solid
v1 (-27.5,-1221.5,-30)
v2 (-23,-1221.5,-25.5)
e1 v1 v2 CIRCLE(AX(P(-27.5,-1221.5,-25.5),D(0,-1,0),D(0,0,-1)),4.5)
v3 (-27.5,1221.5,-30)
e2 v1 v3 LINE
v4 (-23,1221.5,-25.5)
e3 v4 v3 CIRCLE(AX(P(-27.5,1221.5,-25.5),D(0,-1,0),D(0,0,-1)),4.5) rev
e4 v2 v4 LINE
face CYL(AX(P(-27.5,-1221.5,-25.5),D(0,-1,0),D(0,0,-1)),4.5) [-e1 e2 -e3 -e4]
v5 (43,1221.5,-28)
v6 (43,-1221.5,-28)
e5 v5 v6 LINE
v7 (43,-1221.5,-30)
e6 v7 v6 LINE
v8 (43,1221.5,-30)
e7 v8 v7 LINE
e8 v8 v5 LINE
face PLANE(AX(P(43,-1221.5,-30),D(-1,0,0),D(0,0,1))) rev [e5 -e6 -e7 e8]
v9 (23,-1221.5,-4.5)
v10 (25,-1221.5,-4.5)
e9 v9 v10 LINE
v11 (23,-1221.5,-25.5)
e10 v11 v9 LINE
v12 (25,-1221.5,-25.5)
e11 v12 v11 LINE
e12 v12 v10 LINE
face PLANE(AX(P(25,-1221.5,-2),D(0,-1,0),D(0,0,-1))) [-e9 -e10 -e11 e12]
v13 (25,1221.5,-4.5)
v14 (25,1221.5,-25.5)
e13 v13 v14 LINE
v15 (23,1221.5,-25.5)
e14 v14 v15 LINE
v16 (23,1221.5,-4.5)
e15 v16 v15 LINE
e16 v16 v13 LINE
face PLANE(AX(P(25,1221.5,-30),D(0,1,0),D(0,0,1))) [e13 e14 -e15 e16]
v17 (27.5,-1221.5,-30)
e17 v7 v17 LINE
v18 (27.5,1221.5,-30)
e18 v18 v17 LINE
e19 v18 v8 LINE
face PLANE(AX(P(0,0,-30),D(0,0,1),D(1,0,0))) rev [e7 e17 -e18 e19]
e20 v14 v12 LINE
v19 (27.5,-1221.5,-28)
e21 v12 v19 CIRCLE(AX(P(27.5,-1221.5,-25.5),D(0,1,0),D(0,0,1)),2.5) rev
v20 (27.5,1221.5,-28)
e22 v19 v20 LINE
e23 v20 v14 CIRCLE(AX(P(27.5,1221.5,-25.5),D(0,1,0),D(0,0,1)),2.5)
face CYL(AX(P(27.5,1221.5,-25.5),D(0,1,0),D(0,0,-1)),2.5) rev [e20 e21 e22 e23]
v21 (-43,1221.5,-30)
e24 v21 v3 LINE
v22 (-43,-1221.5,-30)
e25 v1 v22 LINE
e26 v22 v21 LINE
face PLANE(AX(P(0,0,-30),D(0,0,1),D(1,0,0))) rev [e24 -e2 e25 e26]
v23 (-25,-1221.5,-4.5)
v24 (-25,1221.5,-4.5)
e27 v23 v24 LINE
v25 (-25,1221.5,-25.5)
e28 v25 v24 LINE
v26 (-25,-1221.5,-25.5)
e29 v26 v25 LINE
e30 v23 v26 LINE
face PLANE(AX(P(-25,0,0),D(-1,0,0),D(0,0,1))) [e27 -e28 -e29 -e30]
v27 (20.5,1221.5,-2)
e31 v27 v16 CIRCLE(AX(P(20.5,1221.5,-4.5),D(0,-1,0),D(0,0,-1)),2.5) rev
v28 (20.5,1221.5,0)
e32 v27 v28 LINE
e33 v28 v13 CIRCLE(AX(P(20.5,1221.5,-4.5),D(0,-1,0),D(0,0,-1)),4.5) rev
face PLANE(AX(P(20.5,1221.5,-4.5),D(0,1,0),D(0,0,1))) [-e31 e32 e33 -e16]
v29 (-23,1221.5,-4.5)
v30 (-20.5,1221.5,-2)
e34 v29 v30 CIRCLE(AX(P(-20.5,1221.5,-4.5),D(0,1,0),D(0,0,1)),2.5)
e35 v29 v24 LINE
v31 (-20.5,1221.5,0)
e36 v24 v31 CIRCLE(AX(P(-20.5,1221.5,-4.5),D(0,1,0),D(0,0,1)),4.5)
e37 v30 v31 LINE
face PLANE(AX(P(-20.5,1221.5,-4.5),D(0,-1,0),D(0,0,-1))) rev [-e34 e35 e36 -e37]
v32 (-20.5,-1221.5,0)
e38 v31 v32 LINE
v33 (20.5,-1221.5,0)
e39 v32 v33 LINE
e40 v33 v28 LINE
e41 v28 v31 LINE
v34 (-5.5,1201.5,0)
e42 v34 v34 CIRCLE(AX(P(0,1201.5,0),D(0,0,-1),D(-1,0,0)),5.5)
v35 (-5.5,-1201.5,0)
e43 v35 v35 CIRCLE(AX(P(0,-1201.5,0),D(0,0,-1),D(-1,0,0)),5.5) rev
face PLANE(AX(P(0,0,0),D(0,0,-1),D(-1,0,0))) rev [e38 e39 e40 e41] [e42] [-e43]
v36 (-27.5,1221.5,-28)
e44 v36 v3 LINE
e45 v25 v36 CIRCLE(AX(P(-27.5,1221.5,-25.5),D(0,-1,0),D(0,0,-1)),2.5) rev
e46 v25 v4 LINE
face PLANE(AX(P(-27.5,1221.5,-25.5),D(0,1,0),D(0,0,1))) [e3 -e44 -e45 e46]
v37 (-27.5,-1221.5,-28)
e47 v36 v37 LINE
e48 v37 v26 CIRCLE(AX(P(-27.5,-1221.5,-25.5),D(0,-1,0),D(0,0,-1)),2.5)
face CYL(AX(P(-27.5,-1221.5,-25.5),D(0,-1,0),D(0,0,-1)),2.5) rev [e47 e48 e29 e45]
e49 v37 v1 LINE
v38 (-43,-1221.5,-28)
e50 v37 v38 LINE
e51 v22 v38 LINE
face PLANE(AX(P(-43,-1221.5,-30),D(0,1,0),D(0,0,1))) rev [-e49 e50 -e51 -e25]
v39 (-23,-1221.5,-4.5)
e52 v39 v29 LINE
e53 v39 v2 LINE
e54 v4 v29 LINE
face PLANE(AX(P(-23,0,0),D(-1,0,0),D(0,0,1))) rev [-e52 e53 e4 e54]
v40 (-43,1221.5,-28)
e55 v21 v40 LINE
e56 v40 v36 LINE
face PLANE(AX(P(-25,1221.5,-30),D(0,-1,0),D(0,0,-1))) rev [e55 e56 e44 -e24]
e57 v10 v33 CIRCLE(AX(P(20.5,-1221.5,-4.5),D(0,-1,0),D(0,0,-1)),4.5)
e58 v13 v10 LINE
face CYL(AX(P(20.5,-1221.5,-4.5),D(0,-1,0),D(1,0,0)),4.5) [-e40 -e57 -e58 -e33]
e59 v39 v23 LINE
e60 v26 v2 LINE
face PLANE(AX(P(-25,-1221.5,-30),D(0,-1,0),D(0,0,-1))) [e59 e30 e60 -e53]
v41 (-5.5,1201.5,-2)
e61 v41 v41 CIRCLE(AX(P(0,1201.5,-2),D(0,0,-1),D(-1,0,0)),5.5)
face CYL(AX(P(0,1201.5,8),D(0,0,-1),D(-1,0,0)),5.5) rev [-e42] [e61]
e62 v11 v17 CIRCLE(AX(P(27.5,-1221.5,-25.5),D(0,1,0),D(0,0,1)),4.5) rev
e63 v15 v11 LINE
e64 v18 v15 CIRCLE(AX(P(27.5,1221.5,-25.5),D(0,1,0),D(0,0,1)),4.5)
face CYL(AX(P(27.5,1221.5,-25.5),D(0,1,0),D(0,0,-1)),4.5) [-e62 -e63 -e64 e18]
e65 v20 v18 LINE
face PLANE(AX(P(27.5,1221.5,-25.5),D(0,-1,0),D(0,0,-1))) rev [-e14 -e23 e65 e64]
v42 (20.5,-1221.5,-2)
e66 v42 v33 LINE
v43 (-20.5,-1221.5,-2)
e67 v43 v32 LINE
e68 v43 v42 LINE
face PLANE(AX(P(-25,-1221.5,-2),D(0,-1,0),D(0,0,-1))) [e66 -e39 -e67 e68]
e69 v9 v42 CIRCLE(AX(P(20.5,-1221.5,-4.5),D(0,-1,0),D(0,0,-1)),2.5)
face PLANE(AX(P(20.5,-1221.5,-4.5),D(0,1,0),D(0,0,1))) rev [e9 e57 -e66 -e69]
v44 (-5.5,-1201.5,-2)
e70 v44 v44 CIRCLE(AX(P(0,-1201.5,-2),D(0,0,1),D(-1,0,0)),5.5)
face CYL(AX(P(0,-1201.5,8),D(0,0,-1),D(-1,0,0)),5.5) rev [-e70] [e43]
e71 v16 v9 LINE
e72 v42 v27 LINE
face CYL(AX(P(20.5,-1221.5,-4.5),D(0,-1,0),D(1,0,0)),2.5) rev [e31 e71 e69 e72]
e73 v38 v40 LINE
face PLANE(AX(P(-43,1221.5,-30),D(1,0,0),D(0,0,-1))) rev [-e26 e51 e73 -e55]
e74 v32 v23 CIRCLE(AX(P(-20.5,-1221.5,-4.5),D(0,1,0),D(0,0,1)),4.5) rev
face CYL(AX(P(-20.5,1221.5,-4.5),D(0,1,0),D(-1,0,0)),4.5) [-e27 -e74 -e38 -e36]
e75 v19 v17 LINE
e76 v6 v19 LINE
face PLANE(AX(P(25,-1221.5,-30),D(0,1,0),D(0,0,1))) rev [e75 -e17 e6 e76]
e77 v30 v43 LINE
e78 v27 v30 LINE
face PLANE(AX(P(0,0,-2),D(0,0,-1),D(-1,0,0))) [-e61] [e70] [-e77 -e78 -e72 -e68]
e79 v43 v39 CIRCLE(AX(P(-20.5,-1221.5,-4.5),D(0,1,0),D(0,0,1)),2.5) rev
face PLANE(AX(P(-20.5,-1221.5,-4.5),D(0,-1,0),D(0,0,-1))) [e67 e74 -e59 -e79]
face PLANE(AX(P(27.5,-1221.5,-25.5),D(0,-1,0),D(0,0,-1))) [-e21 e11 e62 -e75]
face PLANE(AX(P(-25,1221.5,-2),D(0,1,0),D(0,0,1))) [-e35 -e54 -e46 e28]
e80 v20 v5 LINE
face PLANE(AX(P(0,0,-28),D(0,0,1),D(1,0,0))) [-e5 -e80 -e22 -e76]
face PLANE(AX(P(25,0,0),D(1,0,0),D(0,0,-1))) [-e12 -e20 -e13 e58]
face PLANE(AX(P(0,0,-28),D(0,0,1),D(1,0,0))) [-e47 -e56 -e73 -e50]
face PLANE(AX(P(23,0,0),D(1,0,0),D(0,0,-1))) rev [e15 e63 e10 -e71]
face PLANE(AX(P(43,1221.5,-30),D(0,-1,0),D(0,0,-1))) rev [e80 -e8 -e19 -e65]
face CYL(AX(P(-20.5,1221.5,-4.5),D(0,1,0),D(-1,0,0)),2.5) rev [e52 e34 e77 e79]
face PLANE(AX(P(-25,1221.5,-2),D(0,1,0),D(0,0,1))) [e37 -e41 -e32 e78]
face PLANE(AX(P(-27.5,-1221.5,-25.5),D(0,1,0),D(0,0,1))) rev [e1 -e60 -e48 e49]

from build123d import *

# Parameters (mm, degrees)
SKETCH1_W                      = 50
SKETCH1_H                      = 2443
BASE_FLANGE1_DEPTH             = 2
EDGE_FLANGE1_STRIP_W           = 13
EDGE_FLANGE1_STRIP_H           = 2
EDGE_FLANGE1_STRIP_CUT_DEPTH   = 2443
EDGE_FLANGE1_STRIP_2_W         = 13
EDGE_FLANGE1_STRIP_2_H         = 2
EDGE_FLANGE1_STRIP_CUT_2_DEPTH = 2443
EDGE_FLANGE1_DEPTH             = 2443
EDGE_FLANGE1_BEND_DEPTH        = 2443
EDGE_FLANGE2_STRIP_W           = 13
EDGE_FLANGE2_STRIP_H           = 2
EDGE_FLANGE2_STRIP_CUT_DEPTH   = 2443
EDGE_FLANGE2_STRIP_2_W         = 13
EDGE_FLANGE2_STRIP_2_H         = 2
EDGE_FLANGE2_STRIP_CUT_2_DEPTH = 2443
EDGE_FLANGE2_DEPTH             = 2443
EDGE_FLANGE2_BEND_DEPTH        = 2443
SKETCH18_R                     = 5.5
CUT_EXTRUDE1_DEPTH             = 10


# Sheet-metal steps are written as plain solids
with BuildPart() as part:
    # Sketch1 → Base-Flange1 (new body)
    with BuildSketch(Plane.XY):
        Rectangle(SKETCH1_W, SKETCH1_H)
    extrude(amount=-BASE_FLANGE1_DEPTH)

    # Edge-Flange1 strip (across the edge) → Edge-Flange1 strip cut (cut)
    with BuildSketch(Plane(origin=(25, 1221.5, -2), x_dir=(-1, 0, 0), z_dir=(0, -1, 0))):
        with Locations((-2, -1)):
            Rectangle(EDGE_FLANGE1_STRIP_W, EDGE_FLANGE1_STRIP_H)
    extrude(amount=EDGE_FLANGE1_STRIP_CUT_DEPTH, mode=Mode.SUBTRACT)

    # Edge-Flange1 strip 2 (across the edge) → Edge-Flange1 strip cut 2 (cut)
    with BuildSketch(Plane(origin=(-25, -1221.5, -2), x_dir=(1, 0, 0), z_dir=(0, 1, 0))):
        with Locations((-2, -1)):
            Rectangle(EDGE_FLANGE1_STRIP_2_W, EDGE_FLANGE1_STRIP_2_H)
    extrude(amount=EDGE_FLANGE1_STRIP_CUT_2_DEPTH, mode=Mode.SUBTRACT)

    # Edge-Flange1 section (across the edge) → Edge-Flange1 (add)
    with BuildSketch(Plane(origin=(25, 1221.5, -2), x_dir=(-1, 0, 0), z_dir=(0, -1, 0))):
        with BuildLine():
            Line((0, 2.5), (0, 28))
            Line((0, 28), (2, 28))
            Line((2, 28), (2, 2.5))
            ThreePointArc((2, 2.5), (2.732233047, 0.732233047), (4.5, 0))
            Line((4.5, 0), (4.5, -2))
            ThreePointArc((4.5, -2), (1.318019485, -0.681980515), (0, 2.5))
        make_face()
    extrude(amount=EDGE_FLANGE1_DEPTH)

    # Edge-Flange1 section 2 (across the edge) → Edge-Flange1 bend (add)
    with BuildSketch(Plane(origin=(-25, -1221.5, -2), x_dir=(1, 0, 0), z_dir=(0, 1, 0))):
        with BuildLine():
            Line((0, 2.5), (0, 28))
            Line((0, 28), (2, 28))
            Line((2, 28), (2, 2.5))
            ThreePointArc((2, 2.5), (2.732233047, 0.732233047), (4.5, 0))
            Line((4.5, 0), (4.5, -2))
            ThreePointArc((4.5, -2), (1.318019485, -0.681980515), (0, 2.5))
        make_face()
    extrude(amount=EDGE_FLANGE1_BEND_DEPTH)

    # Edge-Flange2 strip (across the edge) → Edge-Flange2 strip cut (cut)
    with BuildSketch(Plane(origin=(-25, 1221.5, -30), x_dir=(0, 0, 1), z_dir=(0, -1, 0))):
        with Locations((-2, -1)):
            Rectangle(EDGE_FLANGE2_STRIP_W, EDGE_FLANGE2_STRIP_H)
    extrude(amount=EDGE_FLANGE2_STRIP_CUT_DEPTH, mode=Mode.SUBTRACT)

    # Edge-Flange2 strip 2 (across the edge) → Edge-Flange2 strip cut 2 (cut)
    with BuildSketch(Plane(origin=(25, -1221.5, -30), x_dir=(0, 0, 1), z_dir=(0, 1, 0))):
        with Locations((-2, -1)):
            Rectangle(EDGE_FLANGE2_STRIP_2_W, EDGE_FLANGE2_STRIP_2_H)
    extrude(amount=EDGE_FLANGE2_STRIP_CUT_2_DEPTH, mode=Mode.SUBTRACT)

    # Edge-Flange2 section (across the edge) → Edge-Flange2 (add)
    with BuildSketch(Plane(origin=(-25, 1221.5, -30), x_dir=(0, 0, 1), z_dir=(0, -1, 0))):
        with BuildLine():
            Line((0, 2.5), (0, 18))
            Line((0, 18), (2, 18))
            Line((2, 18), (2, 2.5))
            ThreePointArc((2, 2.5), (2.732233047, 0.732233047), (4.5, 0))
            Line((4.5, 0), (4.5, -2))
            ThreePointArc((4.5, -2), (1.318019485, -0.681980515), (0, 2.5))
        make_face()
    extrude(amount=EDGE_FLANGE2_DEPTH)

    # Edge-Flange2 section 2 (across the edge) → Edge-Flange2 bend (add)
    with BuildSketch(Plane(origin=(25, -1221.5, -30), x_dir=(0, 0, 1), z_dir=(0, 1, 0))):
        with BuildLine():
            Line((0, 2.5), (0, 18))
            Line((0, 18), (2, 18))
            Line((2, 18), (2, 2.5))
            ThreePointArc((2, 2.5), (2.732233047, 0.732233047), (4.5, 0))
            Line((4.5, 0), (4.5, -2))
            ThreePointArc((4.5, -2), (1.318019485, -0.681980515), (0, 2.5))
        make_face()
    extrude(amount=EDGE_FLANGE2_BEND_DEPTH)

    # Sketch18 → Cut-Extrude1 (cut)
    with BuildSketch(Plane(origin=(0, 0, -2), x_dir=(-1, 0, 0), z_dir=(0, 0, -1))):
        with Locations((0, 1201.5)):
            Circle(SKETCH18_R)
    cut_extrude1 = extrude(amount=-CUT_EXTRUDE1_DEPTH, mode=Mode.SUBTRACT)

    # Mirror1: Cut-Extrude1 across plane
    add(cut_extrude1.mirror(Plane.ZX), mode=Mode.SUBTRACT)


solid = part.part
